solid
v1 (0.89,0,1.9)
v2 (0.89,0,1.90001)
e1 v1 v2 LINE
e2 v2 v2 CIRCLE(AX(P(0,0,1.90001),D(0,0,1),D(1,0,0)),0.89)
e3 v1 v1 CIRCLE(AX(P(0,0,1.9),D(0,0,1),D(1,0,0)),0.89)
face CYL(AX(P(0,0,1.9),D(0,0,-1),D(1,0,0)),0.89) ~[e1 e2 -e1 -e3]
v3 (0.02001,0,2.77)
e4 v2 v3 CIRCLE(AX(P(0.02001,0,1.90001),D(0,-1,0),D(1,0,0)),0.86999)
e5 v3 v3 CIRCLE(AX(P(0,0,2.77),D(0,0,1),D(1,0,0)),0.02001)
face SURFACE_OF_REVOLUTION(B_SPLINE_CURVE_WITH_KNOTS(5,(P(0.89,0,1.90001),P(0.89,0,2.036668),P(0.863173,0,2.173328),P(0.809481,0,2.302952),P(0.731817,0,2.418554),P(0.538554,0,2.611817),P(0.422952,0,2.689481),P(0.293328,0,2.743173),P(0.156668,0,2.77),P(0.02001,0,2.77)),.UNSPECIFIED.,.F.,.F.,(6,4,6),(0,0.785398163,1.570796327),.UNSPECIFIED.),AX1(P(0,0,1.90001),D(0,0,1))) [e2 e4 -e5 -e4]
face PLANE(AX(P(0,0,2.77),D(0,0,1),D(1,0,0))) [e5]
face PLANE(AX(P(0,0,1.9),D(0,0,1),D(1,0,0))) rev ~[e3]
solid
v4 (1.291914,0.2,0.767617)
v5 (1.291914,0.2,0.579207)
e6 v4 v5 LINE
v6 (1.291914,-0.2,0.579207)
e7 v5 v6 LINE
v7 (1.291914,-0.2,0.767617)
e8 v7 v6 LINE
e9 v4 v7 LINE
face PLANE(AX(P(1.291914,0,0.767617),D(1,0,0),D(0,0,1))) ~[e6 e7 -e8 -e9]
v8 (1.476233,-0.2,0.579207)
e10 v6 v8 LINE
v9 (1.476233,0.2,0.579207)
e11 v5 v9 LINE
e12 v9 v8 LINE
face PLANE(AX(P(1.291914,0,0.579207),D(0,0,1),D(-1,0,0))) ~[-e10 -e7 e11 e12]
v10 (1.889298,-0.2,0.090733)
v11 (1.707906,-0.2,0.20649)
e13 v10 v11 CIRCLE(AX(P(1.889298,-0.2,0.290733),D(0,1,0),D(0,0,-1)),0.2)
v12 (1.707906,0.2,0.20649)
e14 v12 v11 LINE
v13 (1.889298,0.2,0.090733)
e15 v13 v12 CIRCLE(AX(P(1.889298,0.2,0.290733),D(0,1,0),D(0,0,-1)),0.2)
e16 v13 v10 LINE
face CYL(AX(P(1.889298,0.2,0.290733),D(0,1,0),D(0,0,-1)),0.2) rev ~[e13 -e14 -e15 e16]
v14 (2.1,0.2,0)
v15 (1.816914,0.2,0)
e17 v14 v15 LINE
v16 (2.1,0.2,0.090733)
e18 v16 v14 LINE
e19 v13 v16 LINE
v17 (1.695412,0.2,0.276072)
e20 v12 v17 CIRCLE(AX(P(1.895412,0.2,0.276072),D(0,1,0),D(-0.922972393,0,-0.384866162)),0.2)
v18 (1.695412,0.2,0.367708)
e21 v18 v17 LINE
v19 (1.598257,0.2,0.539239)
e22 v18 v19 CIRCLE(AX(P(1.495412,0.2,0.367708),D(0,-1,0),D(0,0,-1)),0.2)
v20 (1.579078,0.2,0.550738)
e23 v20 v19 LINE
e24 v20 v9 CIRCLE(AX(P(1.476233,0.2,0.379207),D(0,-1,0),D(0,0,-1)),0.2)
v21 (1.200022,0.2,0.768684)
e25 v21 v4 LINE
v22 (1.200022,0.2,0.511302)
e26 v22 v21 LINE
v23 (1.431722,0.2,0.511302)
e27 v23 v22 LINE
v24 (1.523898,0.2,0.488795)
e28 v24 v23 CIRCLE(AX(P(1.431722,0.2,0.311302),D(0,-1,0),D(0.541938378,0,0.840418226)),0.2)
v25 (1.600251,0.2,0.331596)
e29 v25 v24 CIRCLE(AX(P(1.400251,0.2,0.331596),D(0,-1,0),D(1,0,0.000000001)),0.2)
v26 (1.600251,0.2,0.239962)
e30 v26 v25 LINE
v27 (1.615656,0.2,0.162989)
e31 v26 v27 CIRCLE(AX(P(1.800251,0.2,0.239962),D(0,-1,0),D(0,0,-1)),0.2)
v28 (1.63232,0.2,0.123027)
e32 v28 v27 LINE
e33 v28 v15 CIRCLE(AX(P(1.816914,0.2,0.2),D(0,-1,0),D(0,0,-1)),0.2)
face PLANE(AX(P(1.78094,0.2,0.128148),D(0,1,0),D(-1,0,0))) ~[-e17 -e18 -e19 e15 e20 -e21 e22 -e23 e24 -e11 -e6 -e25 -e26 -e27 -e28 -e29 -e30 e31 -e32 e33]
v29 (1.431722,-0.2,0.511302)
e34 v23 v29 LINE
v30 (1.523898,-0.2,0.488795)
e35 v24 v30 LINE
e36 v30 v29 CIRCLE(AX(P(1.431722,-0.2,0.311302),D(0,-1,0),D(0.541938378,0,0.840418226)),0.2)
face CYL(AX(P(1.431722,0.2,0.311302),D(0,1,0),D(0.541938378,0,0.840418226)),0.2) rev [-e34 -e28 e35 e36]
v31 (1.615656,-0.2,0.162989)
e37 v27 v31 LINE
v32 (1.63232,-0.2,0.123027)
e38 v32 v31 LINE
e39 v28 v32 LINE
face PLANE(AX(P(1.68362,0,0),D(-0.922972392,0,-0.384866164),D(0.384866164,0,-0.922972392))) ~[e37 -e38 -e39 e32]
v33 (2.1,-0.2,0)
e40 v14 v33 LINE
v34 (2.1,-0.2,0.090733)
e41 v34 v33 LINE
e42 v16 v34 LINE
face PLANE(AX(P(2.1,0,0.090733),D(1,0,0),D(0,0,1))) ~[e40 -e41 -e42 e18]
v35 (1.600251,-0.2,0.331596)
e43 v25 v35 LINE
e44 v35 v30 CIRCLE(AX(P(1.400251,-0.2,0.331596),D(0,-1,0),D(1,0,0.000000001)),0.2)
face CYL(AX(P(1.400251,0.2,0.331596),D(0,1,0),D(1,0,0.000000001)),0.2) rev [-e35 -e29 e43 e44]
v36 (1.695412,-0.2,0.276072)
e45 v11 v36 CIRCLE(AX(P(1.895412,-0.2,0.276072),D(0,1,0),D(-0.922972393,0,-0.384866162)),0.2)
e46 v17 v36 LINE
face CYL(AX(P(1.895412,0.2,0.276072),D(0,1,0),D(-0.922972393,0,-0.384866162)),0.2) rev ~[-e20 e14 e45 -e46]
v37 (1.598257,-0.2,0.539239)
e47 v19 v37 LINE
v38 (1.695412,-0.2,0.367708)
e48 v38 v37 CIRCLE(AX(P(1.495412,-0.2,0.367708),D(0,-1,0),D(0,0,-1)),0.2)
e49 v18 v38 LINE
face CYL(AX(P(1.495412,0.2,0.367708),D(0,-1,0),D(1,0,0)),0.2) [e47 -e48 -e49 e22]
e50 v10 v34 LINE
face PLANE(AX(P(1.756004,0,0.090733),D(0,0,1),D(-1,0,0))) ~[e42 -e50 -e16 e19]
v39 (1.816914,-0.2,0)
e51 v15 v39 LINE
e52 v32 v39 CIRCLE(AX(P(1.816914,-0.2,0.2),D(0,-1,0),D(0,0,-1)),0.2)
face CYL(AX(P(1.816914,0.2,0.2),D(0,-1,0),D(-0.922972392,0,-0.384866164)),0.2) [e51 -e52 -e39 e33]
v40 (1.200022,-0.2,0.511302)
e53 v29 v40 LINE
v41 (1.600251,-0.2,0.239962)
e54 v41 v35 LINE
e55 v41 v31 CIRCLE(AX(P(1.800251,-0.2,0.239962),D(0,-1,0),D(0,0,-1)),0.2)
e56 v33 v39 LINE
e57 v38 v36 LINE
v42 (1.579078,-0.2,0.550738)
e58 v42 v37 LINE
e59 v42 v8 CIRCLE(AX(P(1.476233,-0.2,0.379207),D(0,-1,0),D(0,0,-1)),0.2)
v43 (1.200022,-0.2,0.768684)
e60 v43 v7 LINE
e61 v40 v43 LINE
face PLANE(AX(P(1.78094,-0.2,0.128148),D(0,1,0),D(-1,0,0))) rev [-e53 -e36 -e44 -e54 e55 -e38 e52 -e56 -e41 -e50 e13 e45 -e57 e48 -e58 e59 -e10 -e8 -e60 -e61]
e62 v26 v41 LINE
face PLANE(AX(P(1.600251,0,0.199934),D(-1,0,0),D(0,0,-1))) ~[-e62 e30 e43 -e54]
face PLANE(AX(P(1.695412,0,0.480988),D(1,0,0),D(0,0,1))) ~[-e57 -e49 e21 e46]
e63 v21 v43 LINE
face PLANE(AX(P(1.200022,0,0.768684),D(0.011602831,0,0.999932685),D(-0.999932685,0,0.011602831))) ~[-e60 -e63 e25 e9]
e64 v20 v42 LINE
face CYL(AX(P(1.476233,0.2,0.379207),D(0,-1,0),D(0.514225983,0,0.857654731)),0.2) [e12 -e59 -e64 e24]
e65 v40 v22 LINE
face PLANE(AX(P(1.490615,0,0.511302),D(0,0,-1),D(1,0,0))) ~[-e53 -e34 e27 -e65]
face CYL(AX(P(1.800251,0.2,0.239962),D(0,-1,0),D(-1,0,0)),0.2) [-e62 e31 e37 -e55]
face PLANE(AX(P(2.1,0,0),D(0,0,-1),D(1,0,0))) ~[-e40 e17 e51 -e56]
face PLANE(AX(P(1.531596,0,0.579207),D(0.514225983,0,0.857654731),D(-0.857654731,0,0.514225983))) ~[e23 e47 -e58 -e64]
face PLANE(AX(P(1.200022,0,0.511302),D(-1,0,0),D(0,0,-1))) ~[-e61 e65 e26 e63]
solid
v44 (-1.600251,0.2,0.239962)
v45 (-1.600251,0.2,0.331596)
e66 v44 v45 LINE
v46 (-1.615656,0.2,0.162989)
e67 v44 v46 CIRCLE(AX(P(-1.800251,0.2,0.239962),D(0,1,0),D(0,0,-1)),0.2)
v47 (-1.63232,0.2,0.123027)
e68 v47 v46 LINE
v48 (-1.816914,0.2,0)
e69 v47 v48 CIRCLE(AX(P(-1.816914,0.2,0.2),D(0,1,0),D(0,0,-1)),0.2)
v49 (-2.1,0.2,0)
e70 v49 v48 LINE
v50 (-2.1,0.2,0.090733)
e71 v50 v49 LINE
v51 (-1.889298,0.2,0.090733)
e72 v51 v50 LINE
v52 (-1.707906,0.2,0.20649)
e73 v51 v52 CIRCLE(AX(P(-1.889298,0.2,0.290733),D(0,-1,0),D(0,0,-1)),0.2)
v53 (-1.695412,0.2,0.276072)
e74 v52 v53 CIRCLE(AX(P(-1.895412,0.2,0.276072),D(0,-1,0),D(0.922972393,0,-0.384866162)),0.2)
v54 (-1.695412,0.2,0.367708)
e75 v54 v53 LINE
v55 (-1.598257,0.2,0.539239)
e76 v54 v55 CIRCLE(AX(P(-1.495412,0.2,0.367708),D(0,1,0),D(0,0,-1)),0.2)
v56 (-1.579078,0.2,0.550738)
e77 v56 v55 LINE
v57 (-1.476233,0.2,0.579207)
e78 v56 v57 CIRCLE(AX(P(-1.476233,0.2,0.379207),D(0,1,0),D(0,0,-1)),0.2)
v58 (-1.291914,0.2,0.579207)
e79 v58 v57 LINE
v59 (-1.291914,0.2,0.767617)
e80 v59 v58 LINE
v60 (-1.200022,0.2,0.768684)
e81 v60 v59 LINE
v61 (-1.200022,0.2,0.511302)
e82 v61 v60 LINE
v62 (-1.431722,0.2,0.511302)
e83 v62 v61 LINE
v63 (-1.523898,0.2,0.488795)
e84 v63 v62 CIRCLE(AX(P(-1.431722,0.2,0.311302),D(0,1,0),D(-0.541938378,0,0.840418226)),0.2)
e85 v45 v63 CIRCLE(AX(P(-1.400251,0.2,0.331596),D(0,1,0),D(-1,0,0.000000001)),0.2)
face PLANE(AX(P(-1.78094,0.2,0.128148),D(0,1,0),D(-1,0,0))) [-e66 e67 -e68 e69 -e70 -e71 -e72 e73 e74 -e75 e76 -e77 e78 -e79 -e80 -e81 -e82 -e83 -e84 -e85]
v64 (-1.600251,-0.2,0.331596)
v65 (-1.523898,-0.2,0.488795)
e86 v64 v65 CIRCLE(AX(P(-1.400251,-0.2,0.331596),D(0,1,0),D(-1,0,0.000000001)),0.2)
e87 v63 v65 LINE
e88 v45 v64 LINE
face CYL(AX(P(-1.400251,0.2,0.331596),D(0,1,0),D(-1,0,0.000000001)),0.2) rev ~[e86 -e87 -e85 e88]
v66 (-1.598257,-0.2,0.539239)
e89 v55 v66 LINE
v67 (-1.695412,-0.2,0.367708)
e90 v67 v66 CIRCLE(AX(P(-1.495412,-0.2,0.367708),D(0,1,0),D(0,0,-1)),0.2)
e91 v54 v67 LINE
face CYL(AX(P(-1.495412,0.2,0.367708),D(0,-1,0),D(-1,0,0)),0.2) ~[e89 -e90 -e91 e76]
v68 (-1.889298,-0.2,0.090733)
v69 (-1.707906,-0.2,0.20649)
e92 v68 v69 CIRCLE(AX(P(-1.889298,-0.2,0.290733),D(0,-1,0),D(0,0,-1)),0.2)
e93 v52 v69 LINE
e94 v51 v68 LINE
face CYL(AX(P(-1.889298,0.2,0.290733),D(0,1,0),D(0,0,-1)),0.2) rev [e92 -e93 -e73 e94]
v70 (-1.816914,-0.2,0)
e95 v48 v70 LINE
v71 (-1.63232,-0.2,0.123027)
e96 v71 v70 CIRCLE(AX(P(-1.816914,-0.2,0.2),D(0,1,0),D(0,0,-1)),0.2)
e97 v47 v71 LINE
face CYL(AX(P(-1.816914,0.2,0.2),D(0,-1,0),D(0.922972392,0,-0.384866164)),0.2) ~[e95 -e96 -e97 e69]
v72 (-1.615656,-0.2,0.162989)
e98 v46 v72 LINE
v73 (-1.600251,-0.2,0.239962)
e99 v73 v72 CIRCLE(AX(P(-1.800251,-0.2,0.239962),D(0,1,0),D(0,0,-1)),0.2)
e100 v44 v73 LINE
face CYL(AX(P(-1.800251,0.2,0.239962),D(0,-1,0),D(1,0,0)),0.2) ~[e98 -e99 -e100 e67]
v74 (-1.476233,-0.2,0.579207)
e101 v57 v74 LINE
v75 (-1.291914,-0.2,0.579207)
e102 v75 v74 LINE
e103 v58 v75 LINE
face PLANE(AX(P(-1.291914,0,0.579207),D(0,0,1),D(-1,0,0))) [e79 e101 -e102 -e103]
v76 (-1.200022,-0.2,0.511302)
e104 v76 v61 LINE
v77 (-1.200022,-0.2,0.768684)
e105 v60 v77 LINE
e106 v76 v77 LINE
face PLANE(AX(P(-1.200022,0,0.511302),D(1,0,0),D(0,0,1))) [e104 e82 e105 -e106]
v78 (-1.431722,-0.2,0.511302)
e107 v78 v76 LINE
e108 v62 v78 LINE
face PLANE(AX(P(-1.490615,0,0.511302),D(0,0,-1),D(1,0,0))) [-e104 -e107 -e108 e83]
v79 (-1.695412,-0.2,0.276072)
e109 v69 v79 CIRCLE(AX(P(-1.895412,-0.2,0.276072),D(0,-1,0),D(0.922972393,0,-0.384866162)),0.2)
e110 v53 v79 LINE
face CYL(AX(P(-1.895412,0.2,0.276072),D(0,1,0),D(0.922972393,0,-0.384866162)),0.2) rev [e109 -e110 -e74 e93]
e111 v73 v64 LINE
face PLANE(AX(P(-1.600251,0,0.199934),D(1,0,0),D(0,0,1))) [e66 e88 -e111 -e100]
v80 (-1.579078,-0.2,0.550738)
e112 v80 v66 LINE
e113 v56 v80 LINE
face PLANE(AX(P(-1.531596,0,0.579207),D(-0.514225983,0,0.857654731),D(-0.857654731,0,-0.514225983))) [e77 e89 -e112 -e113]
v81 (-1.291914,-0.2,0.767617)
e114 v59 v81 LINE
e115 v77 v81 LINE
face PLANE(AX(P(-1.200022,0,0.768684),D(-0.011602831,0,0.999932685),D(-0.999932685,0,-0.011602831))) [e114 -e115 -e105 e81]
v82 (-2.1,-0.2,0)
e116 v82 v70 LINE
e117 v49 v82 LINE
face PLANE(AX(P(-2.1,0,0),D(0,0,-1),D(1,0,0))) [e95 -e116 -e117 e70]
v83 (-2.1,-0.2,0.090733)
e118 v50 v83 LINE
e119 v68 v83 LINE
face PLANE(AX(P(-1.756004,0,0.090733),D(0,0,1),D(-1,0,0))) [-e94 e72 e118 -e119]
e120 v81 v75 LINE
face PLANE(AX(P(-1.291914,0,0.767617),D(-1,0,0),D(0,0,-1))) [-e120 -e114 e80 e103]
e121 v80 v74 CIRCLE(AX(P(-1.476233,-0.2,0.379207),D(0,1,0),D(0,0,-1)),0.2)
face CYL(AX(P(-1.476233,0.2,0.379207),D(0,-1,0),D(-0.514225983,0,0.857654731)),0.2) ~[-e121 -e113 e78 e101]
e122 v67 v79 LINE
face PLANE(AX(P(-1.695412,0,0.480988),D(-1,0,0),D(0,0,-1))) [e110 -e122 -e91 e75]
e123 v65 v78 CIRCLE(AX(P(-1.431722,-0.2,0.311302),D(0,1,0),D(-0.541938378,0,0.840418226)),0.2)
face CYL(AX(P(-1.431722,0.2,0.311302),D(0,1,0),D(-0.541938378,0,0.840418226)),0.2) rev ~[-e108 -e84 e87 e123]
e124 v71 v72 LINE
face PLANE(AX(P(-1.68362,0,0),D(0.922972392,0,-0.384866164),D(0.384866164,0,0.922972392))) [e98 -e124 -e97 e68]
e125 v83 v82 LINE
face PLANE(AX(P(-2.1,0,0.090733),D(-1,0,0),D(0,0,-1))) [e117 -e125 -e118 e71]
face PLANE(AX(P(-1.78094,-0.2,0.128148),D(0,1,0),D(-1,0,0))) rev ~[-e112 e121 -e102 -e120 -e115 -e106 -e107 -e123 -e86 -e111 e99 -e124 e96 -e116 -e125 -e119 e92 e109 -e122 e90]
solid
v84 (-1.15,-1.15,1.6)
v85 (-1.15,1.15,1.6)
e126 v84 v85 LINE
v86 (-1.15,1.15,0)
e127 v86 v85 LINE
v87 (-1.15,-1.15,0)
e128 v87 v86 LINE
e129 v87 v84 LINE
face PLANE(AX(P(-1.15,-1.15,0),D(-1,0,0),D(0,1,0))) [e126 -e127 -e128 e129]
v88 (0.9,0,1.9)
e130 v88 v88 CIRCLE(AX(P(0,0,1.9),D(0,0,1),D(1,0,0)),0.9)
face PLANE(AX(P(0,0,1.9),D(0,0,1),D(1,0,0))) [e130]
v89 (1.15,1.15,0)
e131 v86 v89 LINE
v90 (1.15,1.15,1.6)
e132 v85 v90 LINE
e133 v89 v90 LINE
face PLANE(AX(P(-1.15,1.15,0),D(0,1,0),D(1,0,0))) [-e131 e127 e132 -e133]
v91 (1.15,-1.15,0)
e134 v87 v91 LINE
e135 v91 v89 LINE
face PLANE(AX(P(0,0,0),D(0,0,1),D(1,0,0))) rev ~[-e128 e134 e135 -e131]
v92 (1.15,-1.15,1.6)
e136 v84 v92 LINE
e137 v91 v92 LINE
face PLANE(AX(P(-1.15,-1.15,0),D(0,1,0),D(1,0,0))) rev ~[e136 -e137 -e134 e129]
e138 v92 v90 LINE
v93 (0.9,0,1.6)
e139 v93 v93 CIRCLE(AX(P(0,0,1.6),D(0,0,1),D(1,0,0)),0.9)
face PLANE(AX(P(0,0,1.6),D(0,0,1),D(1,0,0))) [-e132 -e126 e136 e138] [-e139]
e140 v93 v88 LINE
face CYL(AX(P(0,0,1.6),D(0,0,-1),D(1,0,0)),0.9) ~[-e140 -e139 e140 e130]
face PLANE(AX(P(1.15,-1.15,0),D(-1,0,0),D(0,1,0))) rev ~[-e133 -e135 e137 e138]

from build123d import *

# Parameters (mm, degrees)
F0_W         = 2.3
F0_H         = 2.3
F1_DEPTH     = 1.6
F2_R         = 0.9
F3_DEPTH     = 0.3
F4_R         = 0.89
F5_DEPTH     = 0.87
F6_R         = 0.86999
F8_DEPTH     = 0.2
F9_R         = 0.2
F10_T1_DEPTH = 0.4


# Not quite as in the source:
# - a fillet or chamfer that OpenCascade refuses, or shapes differently, is made with other operations: its cross-section is extruded or revolved along the edge and cut away or added
# - a fillet or chamfer is up to 0.001 mm smaller than in the source, because OpenCascade refuses the exact size


with BuildPart() as f1:
    # F0 (on Top) → F1 (new body)
    with BuildSketch(Plane.XY):
        Rectangle(F0_W, F0_H)
    extrude(amount=F1_DEPTH)

    # F2 (on face) → F3 (join)
    with BuildSketch(Plane.XY.offset(1.6)):
        Circle(F2_R)
    extrude(amount=F3_DEPTH)


with BuildPart() as f5:
    # F4 (on face) → F5 (new body)
    with BuildSketch(Plane.XY.offset(1.9)):
        Circle(F4_R)
    extrude(amount=F5_DEPTH)

    # F6 (radius 0.87 in the source; OpenCascade refuses exactly that, so slightly less here)
    f6_edges = [f5.edges().sort_by_distance(p)[0] for p in [
        (-0.89, 0, 2.77),
    ]]
    fillet(f6_edges, radius=F6_R)


with BuildPart() as f8:
    # F7 (on Front) → F8 (new body, symmetric)
    with BuildSketch(Plane.XZ):
        Polygon((-1.2000221869, 0.5113023705), (-1.2000221869, 0.7686837657), (-1.2919139418, 0.7676174894), (-1.2919139418, 0.5792069319), (-1.5315959482, 0.5792069319), (-1.6954116582, 0.4809875769), (-1.6954116582, 0.2360437474), (-1.756004122, 0.0907330487), (-2.1, 0.0907330487), (-2.1, 0), (-1.683620195, 0), (-1.6002507828, 0.199933569), (-1.6002507828, 0.4406041371), (-1.4906145475, 0.5113023705), align=None)
    extrude(amount=F8_DEPTH, both=True)

    # F9
    f9_edges = [f8.edges().sort_by_distance(p)[0] for p in [
        (-1.695412, 0, 0.480988),
        (-1.531596, 0, 0.579207),
        (-1.600251, 0, 0.199934),
        (-1.68362, 0, 0),
    ]]
    fillet(f9_edges, radius=F9_R)

    # F10: fillet of radius 0.2 on 4 edges, made by hand

    # F10_s2 → F10_t1 (join)
    with BuildSketch(Plane.XZ.offset(-0.2)):
        with BuildLine():
            ThreePointArc((-1.8892982143, 0.0907330487), (-1.7783807823, 0.1243079205), (-1.7047037359, 0.2137598158))
            Line((-1.7047037359, 0.2137598158), (-1.756004122, 0.0907330487))
            Line((-1.756004122, 0.0907330487), (-1.8892982143, 0.0907330487))
        make_face()
        with BuildLine():
            ThreePointArc((-1.7108171798, 0.1990987714), (-1.6993008532, 0.2368221359), (-1.6954116582, 0.2760720043))
            Line((-1.6954116582, 0.2760720043), (-1.6954116582, 0.2360437474))
            Line((-1.6954116582, 0.2360437474), (-1.7108171798, 0.1990987714))
        make_face()
        with BuildLine():
            ThreePointArc((-1.6002507828, 0.3315961203), (-1.5758604852, 0.4273104473), (-1.5086384588, 0.4996797652))
            Line((-1.5086384588, 0.4996797652), (-1.6002507828, 0.4406041371))
            Line((-1.6002507828, 0.4406041371), (-1.6002507828, 0.3315961203))
        make_face()
        with BuildLine():
            ThreePointArc((-1.540109264, 0.4793860154), (-1.4882161497, 0.5031574316), (-1.4317215879, 0.5113023705))
            Line((-1.4317215879, 0.5113023705), (-1.4906145475, 0.5113023705))
            Line((-1.4906145475, 0.5113023705), (-1.540109264, 0.4793860154))
        make_face()
    extrude(amount=F10_T1_DEPTH)


with BuildPart() as f11_1:
    # F11: instance of F8
    add(f8.part.mirror(Plane.YZ))


solid = Compound([f1.part, f5.part, f8.part, f11_1.part])
